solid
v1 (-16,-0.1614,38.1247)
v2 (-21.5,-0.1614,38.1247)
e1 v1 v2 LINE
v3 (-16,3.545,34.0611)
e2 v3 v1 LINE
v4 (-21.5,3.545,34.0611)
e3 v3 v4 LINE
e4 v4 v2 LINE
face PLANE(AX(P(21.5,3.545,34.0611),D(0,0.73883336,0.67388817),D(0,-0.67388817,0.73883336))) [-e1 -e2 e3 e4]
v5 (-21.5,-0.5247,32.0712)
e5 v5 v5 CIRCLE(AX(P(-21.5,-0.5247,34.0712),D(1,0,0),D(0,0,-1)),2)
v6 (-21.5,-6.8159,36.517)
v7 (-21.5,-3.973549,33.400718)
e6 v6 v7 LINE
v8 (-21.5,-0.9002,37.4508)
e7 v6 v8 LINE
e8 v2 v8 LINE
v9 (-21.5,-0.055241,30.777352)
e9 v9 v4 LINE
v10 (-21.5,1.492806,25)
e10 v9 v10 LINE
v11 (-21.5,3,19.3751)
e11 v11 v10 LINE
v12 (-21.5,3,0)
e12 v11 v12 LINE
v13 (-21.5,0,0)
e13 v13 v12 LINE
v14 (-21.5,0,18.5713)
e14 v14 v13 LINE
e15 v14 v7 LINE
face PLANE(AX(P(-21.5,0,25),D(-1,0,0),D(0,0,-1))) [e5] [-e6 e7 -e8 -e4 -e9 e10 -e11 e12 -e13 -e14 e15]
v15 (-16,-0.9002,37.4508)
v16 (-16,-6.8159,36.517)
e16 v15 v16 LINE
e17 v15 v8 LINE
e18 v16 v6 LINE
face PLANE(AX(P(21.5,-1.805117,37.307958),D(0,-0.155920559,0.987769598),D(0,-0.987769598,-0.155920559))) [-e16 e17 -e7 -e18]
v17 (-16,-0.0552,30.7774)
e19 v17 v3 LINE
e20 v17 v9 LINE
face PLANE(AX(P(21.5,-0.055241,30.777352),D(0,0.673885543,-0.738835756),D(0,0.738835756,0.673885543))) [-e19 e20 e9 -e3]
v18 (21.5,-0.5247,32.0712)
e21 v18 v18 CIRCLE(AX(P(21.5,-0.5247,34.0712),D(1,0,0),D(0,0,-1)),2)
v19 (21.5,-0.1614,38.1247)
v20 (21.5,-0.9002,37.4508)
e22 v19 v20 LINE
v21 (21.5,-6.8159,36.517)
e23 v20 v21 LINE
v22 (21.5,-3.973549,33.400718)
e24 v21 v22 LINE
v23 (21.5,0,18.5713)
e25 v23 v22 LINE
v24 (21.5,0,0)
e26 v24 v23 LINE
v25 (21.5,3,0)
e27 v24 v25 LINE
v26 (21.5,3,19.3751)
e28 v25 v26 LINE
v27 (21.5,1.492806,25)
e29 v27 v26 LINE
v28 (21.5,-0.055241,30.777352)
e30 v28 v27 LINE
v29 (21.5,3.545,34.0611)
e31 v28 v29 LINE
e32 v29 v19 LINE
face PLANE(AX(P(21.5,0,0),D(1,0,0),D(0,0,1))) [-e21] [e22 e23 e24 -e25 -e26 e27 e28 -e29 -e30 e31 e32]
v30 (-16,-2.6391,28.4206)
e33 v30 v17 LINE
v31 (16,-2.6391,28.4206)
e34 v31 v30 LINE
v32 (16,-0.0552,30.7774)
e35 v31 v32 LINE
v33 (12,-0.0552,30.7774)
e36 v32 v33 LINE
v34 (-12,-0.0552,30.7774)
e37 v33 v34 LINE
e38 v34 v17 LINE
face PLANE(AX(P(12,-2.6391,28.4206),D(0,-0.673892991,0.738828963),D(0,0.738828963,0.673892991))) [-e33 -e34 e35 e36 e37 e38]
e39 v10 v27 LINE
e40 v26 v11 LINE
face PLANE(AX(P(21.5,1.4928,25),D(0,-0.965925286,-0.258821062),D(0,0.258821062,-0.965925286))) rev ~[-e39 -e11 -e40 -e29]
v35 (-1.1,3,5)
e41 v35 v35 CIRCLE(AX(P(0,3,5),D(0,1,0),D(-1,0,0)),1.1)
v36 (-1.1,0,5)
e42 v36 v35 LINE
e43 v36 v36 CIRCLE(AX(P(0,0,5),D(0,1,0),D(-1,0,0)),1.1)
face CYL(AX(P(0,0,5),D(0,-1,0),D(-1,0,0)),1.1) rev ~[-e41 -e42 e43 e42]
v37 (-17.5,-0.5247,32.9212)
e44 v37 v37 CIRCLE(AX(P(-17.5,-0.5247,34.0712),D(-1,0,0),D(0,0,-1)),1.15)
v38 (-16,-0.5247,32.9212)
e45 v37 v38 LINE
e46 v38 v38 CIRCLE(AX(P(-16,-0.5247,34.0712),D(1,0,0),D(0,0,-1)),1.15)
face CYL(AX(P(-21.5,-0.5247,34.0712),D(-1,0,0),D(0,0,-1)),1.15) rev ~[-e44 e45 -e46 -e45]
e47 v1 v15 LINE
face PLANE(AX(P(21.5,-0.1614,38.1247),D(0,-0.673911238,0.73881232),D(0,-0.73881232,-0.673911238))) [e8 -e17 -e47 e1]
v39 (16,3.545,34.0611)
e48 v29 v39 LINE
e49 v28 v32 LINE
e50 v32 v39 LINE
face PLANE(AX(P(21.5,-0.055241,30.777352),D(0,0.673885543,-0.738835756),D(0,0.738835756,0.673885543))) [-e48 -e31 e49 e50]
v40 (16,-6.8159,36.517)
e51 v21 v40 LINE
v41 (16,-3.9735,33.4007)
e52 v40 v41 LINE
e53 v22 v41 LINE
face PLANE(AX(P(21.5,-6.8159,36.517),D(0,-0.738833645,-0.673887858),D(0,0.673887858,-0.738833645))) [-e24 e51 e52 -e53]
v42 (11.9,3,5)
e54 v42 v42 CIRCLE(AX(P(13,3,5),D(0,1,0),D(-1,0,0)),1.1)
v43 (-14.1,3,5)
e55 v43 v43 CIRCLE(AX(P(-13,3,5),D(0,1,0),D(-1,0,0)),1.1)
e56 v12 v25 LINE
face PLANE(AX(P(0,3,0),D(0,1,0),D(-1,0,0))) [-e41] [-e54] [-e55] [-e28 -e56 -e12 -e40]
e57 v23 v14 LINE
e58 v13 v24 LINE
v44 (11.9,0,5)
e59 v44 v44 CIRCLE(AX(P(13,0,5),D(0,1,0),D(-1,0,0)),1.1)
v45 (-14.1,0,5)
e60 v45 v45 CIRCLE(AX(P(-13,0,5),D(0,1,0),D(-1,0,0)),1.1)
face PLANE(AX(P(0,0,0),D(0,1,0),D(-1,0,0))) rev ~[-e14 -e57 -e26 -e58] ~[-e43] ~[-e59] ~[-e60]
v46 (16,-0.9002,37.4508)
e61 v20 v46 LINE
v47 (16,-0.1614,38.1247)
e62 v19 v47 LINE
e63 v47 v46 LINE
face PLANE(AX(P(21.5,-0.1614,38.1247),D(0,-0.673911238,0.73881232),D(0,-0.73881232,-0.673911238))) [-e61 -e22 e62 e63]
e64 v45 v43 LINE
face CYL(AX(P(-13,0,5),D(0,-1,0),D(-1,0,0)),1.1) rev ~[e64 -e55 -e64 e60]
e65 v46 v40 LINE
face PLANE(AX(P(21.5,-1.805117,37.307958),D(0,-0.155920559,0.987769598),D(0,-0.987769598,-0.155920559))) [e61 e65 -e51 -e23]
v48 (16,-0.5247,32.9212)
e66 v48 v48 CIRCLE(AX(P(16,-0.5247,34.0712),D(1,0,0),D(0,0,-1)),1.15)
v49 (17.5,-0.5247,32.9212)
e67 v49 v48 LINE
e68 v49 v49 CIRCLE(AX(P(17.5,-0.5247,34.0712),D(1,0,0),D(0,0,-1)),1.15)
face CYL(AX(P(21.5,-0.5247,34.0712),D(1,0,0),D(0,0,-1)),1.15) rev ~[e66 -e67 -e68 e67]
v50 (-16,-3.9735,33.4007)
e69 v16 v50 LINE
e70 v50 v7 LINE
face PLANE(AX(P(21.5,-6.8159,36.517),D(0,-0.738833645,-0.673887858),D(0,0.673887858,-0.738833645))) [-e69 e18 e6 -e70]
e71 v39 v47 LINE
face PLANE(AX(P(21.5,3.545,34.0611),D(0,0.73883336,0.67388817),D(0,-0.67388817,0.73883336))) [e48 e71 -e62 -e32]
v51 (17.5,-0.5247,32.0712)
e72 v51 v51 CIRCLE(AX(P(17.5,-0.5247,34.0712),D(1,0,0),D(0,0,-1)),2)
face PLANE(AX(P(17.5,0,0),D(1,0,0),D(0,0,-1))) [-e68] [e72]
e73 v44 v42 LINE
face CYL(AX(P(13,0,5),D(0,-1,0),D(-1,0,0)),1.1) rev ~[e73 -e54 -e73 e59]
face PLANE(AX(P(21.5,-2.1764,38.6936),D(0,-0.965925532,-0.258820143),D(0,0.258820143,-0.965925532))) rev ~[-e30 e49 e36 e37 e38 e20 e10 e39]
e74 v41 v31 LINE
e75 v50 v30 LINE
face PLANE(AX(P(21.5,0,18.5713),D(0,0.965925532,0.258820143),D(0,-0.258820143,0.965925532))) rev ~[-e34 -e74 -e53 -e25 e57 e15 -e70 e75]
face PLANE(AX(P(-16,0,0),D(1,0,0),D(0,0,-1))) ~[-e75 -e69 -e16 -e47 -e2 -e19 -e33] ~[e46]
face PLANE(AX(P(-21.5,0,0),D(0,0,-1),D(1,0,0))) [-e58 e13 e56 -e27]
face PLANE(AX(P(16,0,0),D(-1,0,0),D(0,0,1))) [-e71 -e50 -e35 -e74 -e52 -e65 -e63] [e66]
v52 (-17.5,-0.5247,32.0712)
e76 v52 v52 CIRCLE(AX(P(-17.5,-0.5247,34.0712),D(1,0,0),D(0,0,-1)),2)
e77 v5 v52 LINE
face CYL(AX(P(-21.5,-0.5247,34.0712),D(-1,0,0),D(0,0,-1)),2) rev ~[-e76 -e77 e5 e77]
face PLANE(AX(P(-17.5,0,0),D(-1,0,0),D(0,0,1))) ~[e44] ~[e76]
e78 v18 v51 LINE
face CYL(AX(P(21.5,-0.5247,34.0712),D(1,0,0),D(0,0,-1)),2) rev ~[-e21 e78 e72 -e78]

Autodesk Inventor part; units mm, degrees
ref_plane "YZ Plane" through (0, 0, 0) normal (1, 0, 0) x (0, 1, 0)
ref_plane "XZ Plane" through (0, 0, 0) normal (0, 1, 0) x (-1, 0, 0)
ref_plane "XY Plane" through (0, 0, 0) normal (0, 0, 1) x (1, 0, 0)
sketch "スケッチ1" plane through (0, 0, 0) normal (0, 1, 0) x (-1, 0, 0)
  line L0 (21.5, 0) -> (-21.5, 0)
  line L1 (-21.5, 0) -> (-21.5, 25)
  line L2 (-21.5, 25) -> (21.5, 25)
  line L3 (21.5, 25) -> (21.5, 0)
  circle A0 centre (0, 5) radius 1.1
  circle A1 centre (13, 5) radius 1.1
  circle A2 centre (-13, 5) radius 1.1
  line L4 (0, 0) -> (0, 25) construction
  dimension "d0" = 43
  dimension "d1" = 13
  dimension "d2" = 2.2
  dimension "d3" = 5
  dimension "d6" = 25
extrude "押し出し1" add sketch "スケッチ1" along normal blind 3
sketch "スケッチ2" plane through (21.5, 0, 25) normal (1, 0, 0) x (0, 0, -1)
  line L0 (5.6249, 3) -> (6.4287, 0)
  line L1 (6.4287, 0) -> (-12.8898, -5.1764)
  line L2 (-12.8898, -5.1764) -> (-13.6936, -2.1764)
  line L3 (-13.6936, -2.1764) -> (5.6249, 3)
  line L4 (0, 3) -> (25, 3) projected
  line L5 (0, 0) -> (25, 0) projected
  line L6 (6.134, 1.1) -> (-6.5703, -2.3041) construction
  dimension "d7" = 20
extrude "押し出し2" add sketch "スケッチ2" against normal up to surface (43 mm away)
sketch "スケッチ3" plane through (21.5, 0, 0) normal (1, 0, 0) x (0, 0, -1)
  line L0 (-36.517, -6.8159) -> (-30.0178, -0.888)
  line L1 (-30.0178, -0.888) -> (-34.0611, 3.545)
  line L2 (-34.0611, 3.545) -> (-38.1247, -0.1614)
  line L3 (-38.1247, -0.1614) -> (-37.4508, -0.9002)
  line L4 (-37.4508, -0.9002) -> (-36.517, -6.8159)
  line L5 (-25, 3) -> (0, 3) projected
  line L6 (-25, 1.4928) -> (-25, 3) projected
  line L7 (-25, 1.4928) -> (-38.6936, -2.1764) projected
  line L8 (-38.6936, -2.1764) -> (-37.8898, -5.1764) projected
  line L9 (-37.8898, -5.1764) -> (-18.5713, 0) projected
  line L10 (-18.5713, 0) -> (0, 0) projected
  line L11 (0, 0) -> (0, 3) projected
  line L12 (-25, 1.4928) -> (-19.3751, 3)
  line L13 (-25, 1.4928) -> (-38.6936, -2.1764) projected
  point P0 (0, 0)
  point P1 (-31.5703, -2.3041)
  point P2 (-36.821, -4.89)
  point P3 (-37.308, -1.8051)
  point P4 (-33.4007, -3.9735)
  point P5 (-30.7774, -0.0552)
extrude "押し出し3" cut sketch "スケッチ3" against normal through all contours L9 L8 L7 L4 | L6 L5 L12
extrude "押し出し4" add sketch "スケッチ3" against normal up to surface (43 mm away) contours L4 L9 L0 | L4 L3 L2 L1 L7
sketch "スケッチ4" plane through (0, 0, 0) normal (1, 0, 0) x (0, 1, 0)
  line L0 (-0.9002, 37.4508) -> (-6.8159, 36.517) projected
  line L1 (-6.8159, 36.517) -> (-3.9735, 33.4007) projected
  line L2 (-3.9735, 33.4007) -> (0, 18.5713) projected
  line L3 (0, 18.5713) -> (0, 0) projected
  line L4 (0, 0) -> (3, 0) projected
  line L5 (3, 19.3751) -> (3, 0) projected
  line L6 (3, 19.3751) -> (-0.0552, 30.7774) projected
  line L7 (-0.0552, 30.7774) -> (3.545, 34.0611) projected
  line L8 (3.545, 34.0611) -> (-0.1614, 38.1247) projected
  line L9 (-0.1614, 38.1247) -> (-0.9002, 37.4508) projected
  line L10 (-0.0552, 30.7774) -> (-2.6391, 28.4206)
  point P0 (0, 0)
extrude "押し出し5" cut sketch "スケッチ4" along normal mid plane 24 contours L9 L8 L7 L10 L2 L1 L0
sketch "スケッチ6" plane through (12, 0, 0) normal (-1, 0, 0) x (0, 0, 1)
  line L0 (33.4007, -3.9735) -> (28.4206, -2.6391) projected
  line L1 (36.517, -6.8159) -> (33.4007, -3.9735) projected
  line L2 (37.4508, -0.9002) -> (36.517, -6.8159) projected
  line L3 (38.1247, -0.1614) -> (37.4508, -0.9002) projected
  line L4 (34.0611, 3.545) -> (38.1247, -0.1614) projected
  line L5 (30.7774, -0.0552) -> (34.0611, 3.545) projected
  line L6 (28.4206, -2.6391) -> (30.7774, -0.0552) projected
  point P0 (0, 0)
extrude "押し出し7" cut sketch "スケッチ6" against normal blind 4
sketch "スケッチ7" plane through (21.5, 0, 0) normal (1, 0, 0) x (0, 0, -1)
  circle A0 centre (-34.0712, -0.5247) radius 0.8 construction
  circle A1 centre (-34.0712, -0.5247) radius 1.15
  point P0 (0, 0)
  dimension "d21" = 2.3
extrude "押し出し8" cut sketch "スケッチ7" against normal up to surface (5.5 mm away)
sketch "スケッチ8" plane through (21.5, 0, 0) normal (1, 0, 0) x (0, 0, -1)
  circle A0 centre (-34.0712, -0.5247) radius 1.15 projected
  circle A1 centre (-34.0712, -0.5247) radius 2
  point P0 (0, 0)
  dimension "d24" = 4
extrude "押し出し9" cut sketch "スケッチ8" against normal blind 4 contours A0 | A1
mirror "ミラー1" about plane through (0, 0, 0) normal (1, 0, 0) of "押し出し9", "押し出し8", "押し出し7"
properties part number "chest_cover_front"
